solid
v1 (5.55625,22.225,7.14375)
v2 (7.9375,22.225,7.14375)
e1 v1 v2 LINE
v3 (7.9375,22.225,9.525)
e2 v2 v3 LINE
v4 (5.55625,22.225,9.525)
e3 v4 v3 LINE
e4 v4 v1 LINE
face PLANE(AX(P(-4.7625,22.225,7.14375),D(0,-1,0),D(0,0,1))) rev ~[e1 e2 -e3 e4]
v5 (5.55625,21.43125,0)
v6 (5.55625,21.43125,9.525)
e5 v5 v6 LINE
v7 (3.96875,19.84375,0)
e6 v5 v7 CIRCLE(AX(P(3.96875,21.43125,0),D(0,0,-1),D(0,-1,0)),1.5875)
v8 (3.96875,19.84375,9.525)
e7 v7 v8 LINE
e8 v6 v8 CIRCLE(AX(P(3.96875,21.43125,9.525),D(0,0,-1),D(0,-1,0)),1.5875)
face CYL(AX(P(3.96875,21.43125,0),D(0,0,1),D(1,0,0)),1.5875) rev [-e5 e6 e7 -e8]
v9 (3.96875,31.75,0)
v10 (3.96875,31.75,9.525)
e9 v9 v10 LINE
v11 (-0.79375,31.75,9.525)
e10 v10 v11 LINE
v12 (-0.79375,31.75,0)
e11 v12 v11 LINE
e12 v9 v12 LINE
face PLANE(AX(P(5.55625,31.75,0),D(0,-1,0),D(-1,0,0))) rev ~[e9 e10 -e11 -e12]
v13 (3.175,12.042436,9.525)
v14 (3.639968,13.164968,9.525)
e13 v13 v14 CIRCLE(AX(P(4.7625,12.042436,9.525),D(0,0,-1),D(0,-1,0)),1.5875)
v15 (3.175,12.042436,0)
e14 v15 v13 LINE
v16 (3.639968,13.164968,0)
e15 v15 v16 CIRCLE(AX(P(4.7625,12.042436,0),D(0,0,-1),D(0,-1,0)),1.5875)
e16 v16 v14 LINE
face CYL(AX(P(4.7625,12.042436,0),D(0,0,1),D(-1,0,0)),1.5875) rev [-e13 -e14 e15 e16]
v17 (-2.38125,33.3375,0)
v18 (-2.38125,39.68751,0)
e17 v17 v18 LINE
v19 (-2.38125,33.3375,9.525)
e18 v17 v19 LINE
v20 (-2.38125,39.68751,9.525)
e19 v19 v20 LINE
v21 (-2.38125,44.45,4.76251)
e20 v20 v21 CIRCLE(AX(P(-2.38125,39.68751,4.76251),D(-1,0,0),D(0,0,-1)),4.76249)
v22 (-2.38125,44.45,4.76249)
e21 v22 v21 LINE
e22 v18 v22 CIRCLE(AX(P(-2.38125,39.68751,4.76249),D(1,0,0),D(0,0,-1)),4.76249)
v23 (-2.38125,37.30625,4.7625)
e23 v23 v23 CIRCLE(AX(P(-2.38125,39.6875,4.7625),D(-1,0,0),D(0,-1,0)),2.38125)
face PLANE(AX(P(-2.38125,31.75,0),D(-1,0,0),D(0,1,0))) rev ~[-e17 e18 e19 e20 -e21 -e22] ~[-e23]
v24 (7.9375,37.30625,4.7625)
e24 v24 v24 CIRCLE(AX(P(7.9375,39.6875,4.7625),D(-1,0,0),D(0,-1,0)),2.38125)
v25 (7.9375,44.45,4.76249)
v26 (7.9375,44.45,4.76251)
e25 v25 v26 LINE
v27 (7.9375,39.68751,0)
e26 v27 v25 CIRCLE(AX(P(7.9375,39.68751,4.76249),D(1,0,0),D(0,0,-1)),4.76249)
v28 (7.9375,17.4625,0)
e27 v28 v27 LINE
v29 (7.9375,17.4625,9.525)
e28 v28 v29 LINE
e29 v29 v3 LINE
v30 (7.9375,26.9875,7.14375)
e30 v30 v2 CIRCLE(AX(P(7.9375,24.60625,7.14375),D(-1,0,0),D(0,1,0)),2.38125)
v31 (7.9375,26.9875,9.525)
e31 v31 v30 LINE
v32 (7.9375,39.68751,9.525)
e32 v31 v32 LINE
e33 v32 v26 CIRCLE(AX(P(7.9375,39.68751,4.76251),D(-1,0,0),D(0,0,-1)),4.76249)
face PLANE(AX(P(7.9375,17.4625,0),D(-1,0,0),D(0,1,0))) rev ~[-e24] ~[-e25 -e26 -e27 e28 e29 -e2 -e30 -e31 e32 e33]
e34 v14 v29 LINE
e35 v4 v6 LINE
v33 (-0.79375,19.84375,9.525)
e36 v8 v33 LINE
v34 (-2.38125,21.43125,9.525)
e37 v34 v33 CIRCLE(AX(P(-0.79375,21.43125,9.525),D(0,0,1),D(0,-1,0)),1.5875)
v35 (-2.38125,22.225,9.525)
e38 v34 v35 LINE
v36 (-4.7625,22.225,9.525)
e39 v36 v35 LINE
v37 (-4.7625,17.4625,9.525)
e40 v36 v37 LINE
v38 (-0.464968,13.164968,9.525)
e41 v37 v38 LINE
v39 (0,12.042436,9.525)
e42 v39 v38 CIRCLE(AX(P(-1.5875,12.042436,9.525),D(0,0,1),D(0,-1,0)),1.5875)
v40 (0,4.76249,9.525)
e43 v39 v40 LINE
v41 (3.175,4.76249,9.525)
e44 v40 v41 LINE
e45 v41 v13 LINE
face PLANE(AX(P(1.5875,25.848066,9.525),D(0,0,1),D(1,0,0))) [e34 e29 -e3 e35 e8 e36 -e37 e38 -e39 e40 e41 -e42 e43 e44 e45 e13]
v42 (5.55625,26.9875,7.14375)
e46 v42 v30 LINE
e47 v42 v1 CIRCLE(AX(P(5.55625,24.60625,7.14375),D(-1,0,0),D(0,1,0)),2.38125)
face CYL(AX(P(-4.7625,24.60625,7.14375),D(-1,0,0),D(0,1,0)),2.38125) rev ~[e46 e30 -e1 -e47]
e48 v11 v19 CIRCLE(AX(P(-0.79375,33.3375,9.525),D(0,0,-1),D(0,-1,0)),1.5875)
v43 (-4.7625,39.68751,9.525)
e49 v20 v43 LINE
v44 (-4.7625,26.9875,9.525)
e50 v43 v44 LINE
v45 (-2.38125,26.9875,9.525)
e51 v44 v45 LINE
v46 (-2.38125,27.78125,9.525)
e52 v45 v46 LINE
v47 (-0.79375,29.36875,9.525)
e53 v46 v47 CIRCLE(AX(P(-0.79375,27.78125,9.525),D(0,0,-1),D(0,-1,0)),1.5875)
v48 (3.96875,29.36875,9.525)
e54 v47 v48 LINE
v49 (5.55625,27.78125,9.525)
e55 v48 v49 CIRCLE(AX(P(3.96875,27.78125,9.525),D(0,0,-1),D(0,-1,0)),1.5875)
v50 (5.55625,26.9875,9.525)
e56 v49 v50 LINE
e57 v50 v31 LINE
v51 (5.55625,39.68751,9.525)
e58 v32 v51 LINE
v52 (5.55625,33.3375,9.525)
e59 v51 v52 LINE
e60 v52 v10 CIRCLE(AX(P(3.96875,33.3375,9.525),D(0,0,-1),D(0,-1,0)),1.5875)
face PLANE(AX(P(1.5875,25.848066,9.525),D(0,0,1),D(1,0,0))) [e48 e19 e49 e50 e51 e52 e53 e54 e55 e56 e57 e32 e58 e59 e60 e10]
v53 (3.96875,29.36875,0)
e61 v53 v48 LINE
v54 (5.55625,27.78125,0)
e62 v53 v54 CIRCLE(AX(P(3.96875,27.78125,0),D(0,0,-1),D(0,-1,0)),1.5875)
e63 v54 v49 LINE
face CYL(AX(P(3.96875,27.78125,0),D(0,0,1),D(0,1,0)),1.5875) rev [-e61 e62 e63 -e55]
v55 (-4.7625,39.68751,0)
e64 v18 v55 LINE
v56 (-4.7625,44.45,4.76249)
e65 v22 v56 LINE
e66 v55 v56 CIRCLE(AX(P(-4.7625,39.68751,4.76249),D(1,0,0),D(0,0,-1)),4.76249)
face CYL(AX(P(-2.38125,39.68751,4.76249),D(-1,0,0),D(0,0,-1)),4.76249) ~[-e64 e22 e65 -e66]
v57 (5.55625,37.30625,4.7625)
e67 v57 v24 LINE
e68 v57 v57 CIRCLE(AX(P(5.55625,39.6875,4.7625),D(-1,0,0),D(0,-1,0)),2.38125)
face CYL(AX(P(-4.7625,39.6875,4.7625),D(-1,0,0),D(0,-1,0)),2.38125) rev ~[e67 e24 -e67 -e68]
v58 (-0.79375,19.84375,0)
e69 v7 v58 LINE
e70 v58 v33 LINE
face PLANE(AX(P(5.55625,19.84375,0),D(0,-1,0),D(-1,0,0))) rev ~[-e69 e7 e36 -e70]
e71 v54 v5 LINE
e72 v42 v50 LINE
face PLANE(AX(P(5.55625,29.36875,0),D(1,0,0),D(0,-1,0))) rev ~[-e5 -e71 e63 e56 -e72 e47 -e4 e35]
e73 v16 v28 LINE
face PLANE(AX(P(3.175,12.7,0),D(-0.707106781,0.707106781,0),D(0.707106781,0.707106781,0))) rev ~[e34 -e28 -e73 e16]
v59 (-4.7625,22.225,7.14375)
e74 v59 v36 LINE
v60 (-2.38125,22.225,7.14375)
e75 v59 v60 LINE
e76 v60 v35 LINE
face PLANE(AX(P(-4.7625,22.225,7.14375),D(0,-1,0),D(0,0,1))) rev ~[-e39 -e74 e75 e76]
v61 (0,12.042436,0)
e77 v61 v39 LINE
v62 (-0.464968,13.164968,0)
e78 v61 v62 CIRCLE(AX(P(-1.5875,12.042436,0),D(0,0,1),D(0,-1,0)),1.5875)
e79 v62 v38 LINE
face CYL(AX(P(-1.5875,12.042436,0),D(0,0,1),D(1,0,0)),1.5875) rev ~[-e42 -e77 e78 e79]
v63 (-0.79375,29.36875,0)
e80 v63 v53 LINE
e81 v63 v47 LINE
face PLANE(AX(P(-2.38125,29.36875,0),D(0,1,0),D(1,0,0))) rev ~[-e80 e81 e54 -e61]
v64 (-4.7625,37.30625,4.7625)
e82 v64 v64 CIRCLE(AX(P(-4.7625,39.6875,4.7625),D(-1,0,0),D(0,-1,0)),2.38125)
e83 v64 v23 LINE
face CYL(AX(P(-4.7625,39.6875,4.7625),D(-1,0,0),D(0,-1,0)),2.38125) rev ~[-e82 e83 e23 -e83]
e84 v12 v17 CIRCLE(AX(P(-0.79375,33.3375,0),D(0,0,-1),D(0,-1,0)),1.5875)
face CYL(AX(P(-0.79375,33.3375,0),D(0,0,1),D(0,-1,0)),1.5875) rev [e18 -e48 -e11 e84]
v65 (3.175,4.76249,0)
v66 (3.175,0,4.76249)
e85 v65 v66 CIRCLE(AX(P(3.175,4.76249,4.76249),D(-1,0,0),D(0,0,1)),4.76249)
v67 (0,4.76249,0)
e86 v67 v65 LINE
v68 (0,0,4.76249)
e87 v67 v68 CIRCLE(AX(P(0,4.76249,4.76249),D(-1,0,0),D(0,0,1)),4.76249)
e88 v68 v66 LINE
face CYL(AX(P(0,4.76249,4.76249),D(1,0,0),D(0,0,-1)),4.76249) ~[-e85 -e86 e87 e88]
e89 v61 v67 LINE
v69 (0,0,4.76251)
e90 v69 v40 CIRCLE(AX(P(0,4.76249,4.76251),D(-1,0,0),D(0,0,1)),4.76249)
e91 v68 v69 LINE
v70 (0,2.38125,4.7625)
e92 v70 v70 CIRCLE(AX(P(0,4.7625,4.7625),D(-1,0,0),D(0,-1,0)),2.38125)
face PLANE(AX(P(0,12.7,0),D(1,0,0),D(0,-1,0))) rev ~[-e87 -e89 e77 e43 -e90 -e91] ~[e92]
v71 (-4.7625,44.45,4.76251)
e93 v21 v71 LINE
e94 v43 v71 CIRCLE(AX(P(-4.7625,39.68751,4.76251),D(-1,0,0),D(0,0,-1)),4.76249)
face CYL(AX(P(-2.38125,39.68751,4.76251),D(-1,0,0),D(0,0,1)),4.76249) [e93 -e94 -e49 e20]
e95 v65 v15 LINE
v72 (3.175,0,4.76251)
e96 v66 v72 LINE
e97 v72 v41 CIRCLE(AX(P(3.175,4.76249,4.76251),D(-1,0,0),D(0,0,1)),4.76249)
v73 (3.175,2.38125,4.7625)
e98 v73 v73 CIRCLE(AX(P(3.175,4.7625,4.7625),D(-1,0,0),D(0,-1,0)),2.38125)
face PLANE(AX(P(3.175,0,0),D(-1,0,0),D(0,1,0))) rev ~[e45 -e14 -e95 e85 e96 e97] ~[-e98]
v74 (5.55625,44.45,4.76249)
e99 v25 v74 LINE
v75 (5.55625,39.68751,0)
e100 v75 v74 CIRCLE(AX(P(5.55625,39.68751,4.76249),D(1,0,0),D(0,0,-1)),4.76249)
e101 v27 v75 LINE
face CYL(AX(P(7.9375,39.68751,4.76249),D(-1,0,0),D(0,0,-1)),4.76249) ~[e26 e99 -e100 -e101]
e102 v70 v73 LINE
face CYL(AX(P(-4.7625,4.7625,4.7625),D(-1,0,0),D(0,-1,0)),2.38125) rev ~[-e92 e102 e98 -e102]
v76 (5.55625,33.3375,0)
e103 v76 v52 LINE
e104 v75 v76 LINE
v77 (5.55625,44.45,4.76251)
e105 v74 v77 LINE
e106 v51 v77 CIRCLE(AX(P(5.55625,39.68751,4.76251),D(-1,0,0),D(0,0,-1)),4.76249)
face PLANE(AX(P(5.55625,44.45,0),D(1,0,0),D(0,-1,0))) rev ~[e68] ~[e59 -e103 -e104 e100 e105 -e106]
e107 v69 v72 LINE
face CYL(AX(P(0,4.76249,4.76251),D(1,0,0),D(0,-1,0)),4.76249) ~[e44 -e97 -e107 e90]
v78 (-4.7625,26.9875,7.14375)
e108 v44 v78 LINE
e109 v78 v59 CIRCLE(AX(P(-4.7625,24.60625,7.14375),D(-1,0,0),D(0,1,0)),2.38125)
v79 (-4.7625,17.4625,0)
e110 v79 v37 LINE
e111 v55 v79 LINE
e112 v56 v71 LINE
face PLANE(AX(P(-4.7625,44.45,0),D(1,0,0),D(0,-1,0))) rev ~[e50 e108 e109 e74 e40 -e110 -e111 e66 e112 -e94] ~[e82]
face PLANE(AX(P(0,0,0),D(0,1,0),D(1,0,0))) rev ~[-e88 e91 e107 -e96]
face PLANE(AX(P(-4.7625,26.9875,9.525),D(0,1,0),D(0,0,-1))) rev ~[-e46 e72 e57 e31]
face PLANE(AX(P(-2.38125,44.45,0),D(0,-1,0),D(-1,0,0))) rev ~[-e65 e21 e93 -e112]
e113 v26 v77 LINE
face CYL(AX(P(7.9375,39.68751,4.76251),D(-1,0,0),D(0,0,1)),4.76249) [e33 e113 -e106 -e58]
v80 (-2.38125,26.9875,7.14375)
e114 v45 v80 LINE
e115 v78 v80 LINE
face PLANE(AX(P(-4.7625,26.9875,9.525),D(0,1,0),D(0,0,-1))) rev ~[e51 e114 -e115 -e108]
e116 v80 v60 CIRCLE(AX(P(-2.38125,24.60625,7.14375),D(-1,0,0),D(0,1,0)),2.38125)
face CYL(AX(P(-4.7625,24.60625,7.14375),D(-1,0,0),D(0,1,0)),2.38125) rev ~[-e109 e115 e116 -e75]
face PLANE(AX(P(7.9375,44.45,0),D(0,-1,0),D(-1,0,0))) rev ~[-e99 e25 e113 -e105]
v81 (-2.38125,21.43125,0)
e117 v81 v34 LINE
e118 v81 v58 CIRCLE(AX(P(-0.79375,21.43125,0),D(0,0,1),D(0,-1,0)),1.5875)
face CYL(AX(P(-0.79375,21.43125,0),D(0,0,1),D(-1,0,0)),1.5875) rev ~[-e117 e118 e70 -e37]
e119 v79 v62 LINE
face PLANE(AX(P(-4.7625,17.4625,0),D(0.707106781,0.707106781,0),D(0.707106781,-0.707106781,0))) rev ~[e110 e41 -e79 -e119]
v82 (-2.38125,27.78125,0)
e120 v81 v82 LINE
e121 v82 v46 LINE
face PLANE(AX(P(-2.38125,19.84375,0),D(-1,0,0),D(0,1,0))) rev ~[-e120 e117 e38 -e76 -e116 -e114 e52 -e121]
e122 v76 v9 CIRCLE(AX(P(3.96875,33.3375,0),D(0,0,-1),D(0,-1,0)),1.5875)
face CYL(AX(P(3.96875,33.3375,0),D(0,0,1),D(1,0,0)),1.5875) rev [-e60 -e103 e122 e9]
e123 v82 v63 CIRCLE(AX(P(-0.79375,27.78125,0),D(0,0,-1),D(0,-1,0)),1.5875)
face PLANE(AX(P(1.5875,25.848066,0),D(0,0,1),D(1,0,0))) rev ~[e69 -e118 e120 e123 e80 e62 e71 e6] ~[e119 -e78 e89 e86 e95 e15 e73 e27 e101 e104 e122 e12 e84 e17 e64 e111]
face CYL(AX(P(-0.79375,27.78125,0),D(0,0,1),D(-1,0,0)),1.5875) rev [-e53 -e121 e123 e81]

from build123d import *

# Parameters (mm, degrees)
F1_DEPTH = 9.525
F2_R     = 1.5875
F3_R     = 4.76249
F4_R     = 2.38125
F5_DEPTH = 12.7


# Not quite as in the source:
# - a fillet or chamfer is up to 0.001 mm smaller than in the source, because OpenCascade refuses the exact size


with BuildPart() as f1:
    # F0 (on Top) → F1 (new body)
    with BuildSketch(Plane.XY):
        Polygon((0, 12.7), (0, 0), (3.175, 0), (3.175, 12.7), (7.9375, 17.4625), (7.9375, 44.45), (5.55625, 44.45), (5.55625, 31.75), (1.5875, 31.75), (-2.38125, 31.75), (-2.38125, 44.45), (-4.7625, 44.45), (-4.7625, 17.4625), align=None)
        Polygon((-2.38125, 29.36875), (1.5875, 29.36875), (5.55625, 29.36875), (5.55625, 19.84375), (-2.38125, 19.84375), align=None, mode=Mode.SUBTRACT)
    extrude(amount=F1_DEPTH)

    # F2
    f2_edges = [f1.edges().sort_by_distance(p)[0] for p in [
        (-2.38125, 31.75, 4.7625),
        (5.55625, 31.75, 4.7625),
        (5.55625, 29.36875, 4.7625),
        (-2.38125, 29.36875, 4.7625),
        (-2.38125, 19.84375, 4.7625),
        (5.55625, 19.84375, 4.7625),
        (0, 12.7, 4.7625),
        (3.175, 12.7, 4.7625),
    ]]
    fillet(f2_edges, radius=F2_R)

    # F3 (radius 4.7625 in the source; OpenCascade refuses exactly that, so slightly less here)
    f3_edges = [f1.edges().sort_by_distance(p)[0] for p in [
        (1.5875, 0, 9.525),
        (1.5875, 0, 0),
        (-3.571875, 44.45, 9.525),
        (-3.571875, 44.45, 0),
        (6.746875, 44.45, 9.525),
        (6.746875, 44.45, 0),
    ]]
    fillet(f3_edges, radius=F3_R)

    # F4 (on face) → F5 (cut, through all)
    with BuildSketch(Plane(origin=(-4.7625, 0, 0), x_dir=(0, -1, 0), z_dir=(-1, 0, 0))):
        with Locations((-39.6875, 4.7625)):
            Circle(F4_R)
        with Locations((-4.7625, 4.7625)):
            Circle(F4_R)
        with BuildLine():
            Line((-22.225, 9.525), (-26.9875, 9.525))
            Line((-26.9875, 9.525), (-26.9875, 7.14375))
            ThreePointArc((-26.9875, 7.14375), (-24.60625, 4.7625), (-22.225, 7.14375))
            Line((-22.225, 7.14375), (-22.225, 9.525))
        make_face()
    extrude(amount=-F5_DEPTH, mode=Mode.SUBTRACT)


solid = f1.part
